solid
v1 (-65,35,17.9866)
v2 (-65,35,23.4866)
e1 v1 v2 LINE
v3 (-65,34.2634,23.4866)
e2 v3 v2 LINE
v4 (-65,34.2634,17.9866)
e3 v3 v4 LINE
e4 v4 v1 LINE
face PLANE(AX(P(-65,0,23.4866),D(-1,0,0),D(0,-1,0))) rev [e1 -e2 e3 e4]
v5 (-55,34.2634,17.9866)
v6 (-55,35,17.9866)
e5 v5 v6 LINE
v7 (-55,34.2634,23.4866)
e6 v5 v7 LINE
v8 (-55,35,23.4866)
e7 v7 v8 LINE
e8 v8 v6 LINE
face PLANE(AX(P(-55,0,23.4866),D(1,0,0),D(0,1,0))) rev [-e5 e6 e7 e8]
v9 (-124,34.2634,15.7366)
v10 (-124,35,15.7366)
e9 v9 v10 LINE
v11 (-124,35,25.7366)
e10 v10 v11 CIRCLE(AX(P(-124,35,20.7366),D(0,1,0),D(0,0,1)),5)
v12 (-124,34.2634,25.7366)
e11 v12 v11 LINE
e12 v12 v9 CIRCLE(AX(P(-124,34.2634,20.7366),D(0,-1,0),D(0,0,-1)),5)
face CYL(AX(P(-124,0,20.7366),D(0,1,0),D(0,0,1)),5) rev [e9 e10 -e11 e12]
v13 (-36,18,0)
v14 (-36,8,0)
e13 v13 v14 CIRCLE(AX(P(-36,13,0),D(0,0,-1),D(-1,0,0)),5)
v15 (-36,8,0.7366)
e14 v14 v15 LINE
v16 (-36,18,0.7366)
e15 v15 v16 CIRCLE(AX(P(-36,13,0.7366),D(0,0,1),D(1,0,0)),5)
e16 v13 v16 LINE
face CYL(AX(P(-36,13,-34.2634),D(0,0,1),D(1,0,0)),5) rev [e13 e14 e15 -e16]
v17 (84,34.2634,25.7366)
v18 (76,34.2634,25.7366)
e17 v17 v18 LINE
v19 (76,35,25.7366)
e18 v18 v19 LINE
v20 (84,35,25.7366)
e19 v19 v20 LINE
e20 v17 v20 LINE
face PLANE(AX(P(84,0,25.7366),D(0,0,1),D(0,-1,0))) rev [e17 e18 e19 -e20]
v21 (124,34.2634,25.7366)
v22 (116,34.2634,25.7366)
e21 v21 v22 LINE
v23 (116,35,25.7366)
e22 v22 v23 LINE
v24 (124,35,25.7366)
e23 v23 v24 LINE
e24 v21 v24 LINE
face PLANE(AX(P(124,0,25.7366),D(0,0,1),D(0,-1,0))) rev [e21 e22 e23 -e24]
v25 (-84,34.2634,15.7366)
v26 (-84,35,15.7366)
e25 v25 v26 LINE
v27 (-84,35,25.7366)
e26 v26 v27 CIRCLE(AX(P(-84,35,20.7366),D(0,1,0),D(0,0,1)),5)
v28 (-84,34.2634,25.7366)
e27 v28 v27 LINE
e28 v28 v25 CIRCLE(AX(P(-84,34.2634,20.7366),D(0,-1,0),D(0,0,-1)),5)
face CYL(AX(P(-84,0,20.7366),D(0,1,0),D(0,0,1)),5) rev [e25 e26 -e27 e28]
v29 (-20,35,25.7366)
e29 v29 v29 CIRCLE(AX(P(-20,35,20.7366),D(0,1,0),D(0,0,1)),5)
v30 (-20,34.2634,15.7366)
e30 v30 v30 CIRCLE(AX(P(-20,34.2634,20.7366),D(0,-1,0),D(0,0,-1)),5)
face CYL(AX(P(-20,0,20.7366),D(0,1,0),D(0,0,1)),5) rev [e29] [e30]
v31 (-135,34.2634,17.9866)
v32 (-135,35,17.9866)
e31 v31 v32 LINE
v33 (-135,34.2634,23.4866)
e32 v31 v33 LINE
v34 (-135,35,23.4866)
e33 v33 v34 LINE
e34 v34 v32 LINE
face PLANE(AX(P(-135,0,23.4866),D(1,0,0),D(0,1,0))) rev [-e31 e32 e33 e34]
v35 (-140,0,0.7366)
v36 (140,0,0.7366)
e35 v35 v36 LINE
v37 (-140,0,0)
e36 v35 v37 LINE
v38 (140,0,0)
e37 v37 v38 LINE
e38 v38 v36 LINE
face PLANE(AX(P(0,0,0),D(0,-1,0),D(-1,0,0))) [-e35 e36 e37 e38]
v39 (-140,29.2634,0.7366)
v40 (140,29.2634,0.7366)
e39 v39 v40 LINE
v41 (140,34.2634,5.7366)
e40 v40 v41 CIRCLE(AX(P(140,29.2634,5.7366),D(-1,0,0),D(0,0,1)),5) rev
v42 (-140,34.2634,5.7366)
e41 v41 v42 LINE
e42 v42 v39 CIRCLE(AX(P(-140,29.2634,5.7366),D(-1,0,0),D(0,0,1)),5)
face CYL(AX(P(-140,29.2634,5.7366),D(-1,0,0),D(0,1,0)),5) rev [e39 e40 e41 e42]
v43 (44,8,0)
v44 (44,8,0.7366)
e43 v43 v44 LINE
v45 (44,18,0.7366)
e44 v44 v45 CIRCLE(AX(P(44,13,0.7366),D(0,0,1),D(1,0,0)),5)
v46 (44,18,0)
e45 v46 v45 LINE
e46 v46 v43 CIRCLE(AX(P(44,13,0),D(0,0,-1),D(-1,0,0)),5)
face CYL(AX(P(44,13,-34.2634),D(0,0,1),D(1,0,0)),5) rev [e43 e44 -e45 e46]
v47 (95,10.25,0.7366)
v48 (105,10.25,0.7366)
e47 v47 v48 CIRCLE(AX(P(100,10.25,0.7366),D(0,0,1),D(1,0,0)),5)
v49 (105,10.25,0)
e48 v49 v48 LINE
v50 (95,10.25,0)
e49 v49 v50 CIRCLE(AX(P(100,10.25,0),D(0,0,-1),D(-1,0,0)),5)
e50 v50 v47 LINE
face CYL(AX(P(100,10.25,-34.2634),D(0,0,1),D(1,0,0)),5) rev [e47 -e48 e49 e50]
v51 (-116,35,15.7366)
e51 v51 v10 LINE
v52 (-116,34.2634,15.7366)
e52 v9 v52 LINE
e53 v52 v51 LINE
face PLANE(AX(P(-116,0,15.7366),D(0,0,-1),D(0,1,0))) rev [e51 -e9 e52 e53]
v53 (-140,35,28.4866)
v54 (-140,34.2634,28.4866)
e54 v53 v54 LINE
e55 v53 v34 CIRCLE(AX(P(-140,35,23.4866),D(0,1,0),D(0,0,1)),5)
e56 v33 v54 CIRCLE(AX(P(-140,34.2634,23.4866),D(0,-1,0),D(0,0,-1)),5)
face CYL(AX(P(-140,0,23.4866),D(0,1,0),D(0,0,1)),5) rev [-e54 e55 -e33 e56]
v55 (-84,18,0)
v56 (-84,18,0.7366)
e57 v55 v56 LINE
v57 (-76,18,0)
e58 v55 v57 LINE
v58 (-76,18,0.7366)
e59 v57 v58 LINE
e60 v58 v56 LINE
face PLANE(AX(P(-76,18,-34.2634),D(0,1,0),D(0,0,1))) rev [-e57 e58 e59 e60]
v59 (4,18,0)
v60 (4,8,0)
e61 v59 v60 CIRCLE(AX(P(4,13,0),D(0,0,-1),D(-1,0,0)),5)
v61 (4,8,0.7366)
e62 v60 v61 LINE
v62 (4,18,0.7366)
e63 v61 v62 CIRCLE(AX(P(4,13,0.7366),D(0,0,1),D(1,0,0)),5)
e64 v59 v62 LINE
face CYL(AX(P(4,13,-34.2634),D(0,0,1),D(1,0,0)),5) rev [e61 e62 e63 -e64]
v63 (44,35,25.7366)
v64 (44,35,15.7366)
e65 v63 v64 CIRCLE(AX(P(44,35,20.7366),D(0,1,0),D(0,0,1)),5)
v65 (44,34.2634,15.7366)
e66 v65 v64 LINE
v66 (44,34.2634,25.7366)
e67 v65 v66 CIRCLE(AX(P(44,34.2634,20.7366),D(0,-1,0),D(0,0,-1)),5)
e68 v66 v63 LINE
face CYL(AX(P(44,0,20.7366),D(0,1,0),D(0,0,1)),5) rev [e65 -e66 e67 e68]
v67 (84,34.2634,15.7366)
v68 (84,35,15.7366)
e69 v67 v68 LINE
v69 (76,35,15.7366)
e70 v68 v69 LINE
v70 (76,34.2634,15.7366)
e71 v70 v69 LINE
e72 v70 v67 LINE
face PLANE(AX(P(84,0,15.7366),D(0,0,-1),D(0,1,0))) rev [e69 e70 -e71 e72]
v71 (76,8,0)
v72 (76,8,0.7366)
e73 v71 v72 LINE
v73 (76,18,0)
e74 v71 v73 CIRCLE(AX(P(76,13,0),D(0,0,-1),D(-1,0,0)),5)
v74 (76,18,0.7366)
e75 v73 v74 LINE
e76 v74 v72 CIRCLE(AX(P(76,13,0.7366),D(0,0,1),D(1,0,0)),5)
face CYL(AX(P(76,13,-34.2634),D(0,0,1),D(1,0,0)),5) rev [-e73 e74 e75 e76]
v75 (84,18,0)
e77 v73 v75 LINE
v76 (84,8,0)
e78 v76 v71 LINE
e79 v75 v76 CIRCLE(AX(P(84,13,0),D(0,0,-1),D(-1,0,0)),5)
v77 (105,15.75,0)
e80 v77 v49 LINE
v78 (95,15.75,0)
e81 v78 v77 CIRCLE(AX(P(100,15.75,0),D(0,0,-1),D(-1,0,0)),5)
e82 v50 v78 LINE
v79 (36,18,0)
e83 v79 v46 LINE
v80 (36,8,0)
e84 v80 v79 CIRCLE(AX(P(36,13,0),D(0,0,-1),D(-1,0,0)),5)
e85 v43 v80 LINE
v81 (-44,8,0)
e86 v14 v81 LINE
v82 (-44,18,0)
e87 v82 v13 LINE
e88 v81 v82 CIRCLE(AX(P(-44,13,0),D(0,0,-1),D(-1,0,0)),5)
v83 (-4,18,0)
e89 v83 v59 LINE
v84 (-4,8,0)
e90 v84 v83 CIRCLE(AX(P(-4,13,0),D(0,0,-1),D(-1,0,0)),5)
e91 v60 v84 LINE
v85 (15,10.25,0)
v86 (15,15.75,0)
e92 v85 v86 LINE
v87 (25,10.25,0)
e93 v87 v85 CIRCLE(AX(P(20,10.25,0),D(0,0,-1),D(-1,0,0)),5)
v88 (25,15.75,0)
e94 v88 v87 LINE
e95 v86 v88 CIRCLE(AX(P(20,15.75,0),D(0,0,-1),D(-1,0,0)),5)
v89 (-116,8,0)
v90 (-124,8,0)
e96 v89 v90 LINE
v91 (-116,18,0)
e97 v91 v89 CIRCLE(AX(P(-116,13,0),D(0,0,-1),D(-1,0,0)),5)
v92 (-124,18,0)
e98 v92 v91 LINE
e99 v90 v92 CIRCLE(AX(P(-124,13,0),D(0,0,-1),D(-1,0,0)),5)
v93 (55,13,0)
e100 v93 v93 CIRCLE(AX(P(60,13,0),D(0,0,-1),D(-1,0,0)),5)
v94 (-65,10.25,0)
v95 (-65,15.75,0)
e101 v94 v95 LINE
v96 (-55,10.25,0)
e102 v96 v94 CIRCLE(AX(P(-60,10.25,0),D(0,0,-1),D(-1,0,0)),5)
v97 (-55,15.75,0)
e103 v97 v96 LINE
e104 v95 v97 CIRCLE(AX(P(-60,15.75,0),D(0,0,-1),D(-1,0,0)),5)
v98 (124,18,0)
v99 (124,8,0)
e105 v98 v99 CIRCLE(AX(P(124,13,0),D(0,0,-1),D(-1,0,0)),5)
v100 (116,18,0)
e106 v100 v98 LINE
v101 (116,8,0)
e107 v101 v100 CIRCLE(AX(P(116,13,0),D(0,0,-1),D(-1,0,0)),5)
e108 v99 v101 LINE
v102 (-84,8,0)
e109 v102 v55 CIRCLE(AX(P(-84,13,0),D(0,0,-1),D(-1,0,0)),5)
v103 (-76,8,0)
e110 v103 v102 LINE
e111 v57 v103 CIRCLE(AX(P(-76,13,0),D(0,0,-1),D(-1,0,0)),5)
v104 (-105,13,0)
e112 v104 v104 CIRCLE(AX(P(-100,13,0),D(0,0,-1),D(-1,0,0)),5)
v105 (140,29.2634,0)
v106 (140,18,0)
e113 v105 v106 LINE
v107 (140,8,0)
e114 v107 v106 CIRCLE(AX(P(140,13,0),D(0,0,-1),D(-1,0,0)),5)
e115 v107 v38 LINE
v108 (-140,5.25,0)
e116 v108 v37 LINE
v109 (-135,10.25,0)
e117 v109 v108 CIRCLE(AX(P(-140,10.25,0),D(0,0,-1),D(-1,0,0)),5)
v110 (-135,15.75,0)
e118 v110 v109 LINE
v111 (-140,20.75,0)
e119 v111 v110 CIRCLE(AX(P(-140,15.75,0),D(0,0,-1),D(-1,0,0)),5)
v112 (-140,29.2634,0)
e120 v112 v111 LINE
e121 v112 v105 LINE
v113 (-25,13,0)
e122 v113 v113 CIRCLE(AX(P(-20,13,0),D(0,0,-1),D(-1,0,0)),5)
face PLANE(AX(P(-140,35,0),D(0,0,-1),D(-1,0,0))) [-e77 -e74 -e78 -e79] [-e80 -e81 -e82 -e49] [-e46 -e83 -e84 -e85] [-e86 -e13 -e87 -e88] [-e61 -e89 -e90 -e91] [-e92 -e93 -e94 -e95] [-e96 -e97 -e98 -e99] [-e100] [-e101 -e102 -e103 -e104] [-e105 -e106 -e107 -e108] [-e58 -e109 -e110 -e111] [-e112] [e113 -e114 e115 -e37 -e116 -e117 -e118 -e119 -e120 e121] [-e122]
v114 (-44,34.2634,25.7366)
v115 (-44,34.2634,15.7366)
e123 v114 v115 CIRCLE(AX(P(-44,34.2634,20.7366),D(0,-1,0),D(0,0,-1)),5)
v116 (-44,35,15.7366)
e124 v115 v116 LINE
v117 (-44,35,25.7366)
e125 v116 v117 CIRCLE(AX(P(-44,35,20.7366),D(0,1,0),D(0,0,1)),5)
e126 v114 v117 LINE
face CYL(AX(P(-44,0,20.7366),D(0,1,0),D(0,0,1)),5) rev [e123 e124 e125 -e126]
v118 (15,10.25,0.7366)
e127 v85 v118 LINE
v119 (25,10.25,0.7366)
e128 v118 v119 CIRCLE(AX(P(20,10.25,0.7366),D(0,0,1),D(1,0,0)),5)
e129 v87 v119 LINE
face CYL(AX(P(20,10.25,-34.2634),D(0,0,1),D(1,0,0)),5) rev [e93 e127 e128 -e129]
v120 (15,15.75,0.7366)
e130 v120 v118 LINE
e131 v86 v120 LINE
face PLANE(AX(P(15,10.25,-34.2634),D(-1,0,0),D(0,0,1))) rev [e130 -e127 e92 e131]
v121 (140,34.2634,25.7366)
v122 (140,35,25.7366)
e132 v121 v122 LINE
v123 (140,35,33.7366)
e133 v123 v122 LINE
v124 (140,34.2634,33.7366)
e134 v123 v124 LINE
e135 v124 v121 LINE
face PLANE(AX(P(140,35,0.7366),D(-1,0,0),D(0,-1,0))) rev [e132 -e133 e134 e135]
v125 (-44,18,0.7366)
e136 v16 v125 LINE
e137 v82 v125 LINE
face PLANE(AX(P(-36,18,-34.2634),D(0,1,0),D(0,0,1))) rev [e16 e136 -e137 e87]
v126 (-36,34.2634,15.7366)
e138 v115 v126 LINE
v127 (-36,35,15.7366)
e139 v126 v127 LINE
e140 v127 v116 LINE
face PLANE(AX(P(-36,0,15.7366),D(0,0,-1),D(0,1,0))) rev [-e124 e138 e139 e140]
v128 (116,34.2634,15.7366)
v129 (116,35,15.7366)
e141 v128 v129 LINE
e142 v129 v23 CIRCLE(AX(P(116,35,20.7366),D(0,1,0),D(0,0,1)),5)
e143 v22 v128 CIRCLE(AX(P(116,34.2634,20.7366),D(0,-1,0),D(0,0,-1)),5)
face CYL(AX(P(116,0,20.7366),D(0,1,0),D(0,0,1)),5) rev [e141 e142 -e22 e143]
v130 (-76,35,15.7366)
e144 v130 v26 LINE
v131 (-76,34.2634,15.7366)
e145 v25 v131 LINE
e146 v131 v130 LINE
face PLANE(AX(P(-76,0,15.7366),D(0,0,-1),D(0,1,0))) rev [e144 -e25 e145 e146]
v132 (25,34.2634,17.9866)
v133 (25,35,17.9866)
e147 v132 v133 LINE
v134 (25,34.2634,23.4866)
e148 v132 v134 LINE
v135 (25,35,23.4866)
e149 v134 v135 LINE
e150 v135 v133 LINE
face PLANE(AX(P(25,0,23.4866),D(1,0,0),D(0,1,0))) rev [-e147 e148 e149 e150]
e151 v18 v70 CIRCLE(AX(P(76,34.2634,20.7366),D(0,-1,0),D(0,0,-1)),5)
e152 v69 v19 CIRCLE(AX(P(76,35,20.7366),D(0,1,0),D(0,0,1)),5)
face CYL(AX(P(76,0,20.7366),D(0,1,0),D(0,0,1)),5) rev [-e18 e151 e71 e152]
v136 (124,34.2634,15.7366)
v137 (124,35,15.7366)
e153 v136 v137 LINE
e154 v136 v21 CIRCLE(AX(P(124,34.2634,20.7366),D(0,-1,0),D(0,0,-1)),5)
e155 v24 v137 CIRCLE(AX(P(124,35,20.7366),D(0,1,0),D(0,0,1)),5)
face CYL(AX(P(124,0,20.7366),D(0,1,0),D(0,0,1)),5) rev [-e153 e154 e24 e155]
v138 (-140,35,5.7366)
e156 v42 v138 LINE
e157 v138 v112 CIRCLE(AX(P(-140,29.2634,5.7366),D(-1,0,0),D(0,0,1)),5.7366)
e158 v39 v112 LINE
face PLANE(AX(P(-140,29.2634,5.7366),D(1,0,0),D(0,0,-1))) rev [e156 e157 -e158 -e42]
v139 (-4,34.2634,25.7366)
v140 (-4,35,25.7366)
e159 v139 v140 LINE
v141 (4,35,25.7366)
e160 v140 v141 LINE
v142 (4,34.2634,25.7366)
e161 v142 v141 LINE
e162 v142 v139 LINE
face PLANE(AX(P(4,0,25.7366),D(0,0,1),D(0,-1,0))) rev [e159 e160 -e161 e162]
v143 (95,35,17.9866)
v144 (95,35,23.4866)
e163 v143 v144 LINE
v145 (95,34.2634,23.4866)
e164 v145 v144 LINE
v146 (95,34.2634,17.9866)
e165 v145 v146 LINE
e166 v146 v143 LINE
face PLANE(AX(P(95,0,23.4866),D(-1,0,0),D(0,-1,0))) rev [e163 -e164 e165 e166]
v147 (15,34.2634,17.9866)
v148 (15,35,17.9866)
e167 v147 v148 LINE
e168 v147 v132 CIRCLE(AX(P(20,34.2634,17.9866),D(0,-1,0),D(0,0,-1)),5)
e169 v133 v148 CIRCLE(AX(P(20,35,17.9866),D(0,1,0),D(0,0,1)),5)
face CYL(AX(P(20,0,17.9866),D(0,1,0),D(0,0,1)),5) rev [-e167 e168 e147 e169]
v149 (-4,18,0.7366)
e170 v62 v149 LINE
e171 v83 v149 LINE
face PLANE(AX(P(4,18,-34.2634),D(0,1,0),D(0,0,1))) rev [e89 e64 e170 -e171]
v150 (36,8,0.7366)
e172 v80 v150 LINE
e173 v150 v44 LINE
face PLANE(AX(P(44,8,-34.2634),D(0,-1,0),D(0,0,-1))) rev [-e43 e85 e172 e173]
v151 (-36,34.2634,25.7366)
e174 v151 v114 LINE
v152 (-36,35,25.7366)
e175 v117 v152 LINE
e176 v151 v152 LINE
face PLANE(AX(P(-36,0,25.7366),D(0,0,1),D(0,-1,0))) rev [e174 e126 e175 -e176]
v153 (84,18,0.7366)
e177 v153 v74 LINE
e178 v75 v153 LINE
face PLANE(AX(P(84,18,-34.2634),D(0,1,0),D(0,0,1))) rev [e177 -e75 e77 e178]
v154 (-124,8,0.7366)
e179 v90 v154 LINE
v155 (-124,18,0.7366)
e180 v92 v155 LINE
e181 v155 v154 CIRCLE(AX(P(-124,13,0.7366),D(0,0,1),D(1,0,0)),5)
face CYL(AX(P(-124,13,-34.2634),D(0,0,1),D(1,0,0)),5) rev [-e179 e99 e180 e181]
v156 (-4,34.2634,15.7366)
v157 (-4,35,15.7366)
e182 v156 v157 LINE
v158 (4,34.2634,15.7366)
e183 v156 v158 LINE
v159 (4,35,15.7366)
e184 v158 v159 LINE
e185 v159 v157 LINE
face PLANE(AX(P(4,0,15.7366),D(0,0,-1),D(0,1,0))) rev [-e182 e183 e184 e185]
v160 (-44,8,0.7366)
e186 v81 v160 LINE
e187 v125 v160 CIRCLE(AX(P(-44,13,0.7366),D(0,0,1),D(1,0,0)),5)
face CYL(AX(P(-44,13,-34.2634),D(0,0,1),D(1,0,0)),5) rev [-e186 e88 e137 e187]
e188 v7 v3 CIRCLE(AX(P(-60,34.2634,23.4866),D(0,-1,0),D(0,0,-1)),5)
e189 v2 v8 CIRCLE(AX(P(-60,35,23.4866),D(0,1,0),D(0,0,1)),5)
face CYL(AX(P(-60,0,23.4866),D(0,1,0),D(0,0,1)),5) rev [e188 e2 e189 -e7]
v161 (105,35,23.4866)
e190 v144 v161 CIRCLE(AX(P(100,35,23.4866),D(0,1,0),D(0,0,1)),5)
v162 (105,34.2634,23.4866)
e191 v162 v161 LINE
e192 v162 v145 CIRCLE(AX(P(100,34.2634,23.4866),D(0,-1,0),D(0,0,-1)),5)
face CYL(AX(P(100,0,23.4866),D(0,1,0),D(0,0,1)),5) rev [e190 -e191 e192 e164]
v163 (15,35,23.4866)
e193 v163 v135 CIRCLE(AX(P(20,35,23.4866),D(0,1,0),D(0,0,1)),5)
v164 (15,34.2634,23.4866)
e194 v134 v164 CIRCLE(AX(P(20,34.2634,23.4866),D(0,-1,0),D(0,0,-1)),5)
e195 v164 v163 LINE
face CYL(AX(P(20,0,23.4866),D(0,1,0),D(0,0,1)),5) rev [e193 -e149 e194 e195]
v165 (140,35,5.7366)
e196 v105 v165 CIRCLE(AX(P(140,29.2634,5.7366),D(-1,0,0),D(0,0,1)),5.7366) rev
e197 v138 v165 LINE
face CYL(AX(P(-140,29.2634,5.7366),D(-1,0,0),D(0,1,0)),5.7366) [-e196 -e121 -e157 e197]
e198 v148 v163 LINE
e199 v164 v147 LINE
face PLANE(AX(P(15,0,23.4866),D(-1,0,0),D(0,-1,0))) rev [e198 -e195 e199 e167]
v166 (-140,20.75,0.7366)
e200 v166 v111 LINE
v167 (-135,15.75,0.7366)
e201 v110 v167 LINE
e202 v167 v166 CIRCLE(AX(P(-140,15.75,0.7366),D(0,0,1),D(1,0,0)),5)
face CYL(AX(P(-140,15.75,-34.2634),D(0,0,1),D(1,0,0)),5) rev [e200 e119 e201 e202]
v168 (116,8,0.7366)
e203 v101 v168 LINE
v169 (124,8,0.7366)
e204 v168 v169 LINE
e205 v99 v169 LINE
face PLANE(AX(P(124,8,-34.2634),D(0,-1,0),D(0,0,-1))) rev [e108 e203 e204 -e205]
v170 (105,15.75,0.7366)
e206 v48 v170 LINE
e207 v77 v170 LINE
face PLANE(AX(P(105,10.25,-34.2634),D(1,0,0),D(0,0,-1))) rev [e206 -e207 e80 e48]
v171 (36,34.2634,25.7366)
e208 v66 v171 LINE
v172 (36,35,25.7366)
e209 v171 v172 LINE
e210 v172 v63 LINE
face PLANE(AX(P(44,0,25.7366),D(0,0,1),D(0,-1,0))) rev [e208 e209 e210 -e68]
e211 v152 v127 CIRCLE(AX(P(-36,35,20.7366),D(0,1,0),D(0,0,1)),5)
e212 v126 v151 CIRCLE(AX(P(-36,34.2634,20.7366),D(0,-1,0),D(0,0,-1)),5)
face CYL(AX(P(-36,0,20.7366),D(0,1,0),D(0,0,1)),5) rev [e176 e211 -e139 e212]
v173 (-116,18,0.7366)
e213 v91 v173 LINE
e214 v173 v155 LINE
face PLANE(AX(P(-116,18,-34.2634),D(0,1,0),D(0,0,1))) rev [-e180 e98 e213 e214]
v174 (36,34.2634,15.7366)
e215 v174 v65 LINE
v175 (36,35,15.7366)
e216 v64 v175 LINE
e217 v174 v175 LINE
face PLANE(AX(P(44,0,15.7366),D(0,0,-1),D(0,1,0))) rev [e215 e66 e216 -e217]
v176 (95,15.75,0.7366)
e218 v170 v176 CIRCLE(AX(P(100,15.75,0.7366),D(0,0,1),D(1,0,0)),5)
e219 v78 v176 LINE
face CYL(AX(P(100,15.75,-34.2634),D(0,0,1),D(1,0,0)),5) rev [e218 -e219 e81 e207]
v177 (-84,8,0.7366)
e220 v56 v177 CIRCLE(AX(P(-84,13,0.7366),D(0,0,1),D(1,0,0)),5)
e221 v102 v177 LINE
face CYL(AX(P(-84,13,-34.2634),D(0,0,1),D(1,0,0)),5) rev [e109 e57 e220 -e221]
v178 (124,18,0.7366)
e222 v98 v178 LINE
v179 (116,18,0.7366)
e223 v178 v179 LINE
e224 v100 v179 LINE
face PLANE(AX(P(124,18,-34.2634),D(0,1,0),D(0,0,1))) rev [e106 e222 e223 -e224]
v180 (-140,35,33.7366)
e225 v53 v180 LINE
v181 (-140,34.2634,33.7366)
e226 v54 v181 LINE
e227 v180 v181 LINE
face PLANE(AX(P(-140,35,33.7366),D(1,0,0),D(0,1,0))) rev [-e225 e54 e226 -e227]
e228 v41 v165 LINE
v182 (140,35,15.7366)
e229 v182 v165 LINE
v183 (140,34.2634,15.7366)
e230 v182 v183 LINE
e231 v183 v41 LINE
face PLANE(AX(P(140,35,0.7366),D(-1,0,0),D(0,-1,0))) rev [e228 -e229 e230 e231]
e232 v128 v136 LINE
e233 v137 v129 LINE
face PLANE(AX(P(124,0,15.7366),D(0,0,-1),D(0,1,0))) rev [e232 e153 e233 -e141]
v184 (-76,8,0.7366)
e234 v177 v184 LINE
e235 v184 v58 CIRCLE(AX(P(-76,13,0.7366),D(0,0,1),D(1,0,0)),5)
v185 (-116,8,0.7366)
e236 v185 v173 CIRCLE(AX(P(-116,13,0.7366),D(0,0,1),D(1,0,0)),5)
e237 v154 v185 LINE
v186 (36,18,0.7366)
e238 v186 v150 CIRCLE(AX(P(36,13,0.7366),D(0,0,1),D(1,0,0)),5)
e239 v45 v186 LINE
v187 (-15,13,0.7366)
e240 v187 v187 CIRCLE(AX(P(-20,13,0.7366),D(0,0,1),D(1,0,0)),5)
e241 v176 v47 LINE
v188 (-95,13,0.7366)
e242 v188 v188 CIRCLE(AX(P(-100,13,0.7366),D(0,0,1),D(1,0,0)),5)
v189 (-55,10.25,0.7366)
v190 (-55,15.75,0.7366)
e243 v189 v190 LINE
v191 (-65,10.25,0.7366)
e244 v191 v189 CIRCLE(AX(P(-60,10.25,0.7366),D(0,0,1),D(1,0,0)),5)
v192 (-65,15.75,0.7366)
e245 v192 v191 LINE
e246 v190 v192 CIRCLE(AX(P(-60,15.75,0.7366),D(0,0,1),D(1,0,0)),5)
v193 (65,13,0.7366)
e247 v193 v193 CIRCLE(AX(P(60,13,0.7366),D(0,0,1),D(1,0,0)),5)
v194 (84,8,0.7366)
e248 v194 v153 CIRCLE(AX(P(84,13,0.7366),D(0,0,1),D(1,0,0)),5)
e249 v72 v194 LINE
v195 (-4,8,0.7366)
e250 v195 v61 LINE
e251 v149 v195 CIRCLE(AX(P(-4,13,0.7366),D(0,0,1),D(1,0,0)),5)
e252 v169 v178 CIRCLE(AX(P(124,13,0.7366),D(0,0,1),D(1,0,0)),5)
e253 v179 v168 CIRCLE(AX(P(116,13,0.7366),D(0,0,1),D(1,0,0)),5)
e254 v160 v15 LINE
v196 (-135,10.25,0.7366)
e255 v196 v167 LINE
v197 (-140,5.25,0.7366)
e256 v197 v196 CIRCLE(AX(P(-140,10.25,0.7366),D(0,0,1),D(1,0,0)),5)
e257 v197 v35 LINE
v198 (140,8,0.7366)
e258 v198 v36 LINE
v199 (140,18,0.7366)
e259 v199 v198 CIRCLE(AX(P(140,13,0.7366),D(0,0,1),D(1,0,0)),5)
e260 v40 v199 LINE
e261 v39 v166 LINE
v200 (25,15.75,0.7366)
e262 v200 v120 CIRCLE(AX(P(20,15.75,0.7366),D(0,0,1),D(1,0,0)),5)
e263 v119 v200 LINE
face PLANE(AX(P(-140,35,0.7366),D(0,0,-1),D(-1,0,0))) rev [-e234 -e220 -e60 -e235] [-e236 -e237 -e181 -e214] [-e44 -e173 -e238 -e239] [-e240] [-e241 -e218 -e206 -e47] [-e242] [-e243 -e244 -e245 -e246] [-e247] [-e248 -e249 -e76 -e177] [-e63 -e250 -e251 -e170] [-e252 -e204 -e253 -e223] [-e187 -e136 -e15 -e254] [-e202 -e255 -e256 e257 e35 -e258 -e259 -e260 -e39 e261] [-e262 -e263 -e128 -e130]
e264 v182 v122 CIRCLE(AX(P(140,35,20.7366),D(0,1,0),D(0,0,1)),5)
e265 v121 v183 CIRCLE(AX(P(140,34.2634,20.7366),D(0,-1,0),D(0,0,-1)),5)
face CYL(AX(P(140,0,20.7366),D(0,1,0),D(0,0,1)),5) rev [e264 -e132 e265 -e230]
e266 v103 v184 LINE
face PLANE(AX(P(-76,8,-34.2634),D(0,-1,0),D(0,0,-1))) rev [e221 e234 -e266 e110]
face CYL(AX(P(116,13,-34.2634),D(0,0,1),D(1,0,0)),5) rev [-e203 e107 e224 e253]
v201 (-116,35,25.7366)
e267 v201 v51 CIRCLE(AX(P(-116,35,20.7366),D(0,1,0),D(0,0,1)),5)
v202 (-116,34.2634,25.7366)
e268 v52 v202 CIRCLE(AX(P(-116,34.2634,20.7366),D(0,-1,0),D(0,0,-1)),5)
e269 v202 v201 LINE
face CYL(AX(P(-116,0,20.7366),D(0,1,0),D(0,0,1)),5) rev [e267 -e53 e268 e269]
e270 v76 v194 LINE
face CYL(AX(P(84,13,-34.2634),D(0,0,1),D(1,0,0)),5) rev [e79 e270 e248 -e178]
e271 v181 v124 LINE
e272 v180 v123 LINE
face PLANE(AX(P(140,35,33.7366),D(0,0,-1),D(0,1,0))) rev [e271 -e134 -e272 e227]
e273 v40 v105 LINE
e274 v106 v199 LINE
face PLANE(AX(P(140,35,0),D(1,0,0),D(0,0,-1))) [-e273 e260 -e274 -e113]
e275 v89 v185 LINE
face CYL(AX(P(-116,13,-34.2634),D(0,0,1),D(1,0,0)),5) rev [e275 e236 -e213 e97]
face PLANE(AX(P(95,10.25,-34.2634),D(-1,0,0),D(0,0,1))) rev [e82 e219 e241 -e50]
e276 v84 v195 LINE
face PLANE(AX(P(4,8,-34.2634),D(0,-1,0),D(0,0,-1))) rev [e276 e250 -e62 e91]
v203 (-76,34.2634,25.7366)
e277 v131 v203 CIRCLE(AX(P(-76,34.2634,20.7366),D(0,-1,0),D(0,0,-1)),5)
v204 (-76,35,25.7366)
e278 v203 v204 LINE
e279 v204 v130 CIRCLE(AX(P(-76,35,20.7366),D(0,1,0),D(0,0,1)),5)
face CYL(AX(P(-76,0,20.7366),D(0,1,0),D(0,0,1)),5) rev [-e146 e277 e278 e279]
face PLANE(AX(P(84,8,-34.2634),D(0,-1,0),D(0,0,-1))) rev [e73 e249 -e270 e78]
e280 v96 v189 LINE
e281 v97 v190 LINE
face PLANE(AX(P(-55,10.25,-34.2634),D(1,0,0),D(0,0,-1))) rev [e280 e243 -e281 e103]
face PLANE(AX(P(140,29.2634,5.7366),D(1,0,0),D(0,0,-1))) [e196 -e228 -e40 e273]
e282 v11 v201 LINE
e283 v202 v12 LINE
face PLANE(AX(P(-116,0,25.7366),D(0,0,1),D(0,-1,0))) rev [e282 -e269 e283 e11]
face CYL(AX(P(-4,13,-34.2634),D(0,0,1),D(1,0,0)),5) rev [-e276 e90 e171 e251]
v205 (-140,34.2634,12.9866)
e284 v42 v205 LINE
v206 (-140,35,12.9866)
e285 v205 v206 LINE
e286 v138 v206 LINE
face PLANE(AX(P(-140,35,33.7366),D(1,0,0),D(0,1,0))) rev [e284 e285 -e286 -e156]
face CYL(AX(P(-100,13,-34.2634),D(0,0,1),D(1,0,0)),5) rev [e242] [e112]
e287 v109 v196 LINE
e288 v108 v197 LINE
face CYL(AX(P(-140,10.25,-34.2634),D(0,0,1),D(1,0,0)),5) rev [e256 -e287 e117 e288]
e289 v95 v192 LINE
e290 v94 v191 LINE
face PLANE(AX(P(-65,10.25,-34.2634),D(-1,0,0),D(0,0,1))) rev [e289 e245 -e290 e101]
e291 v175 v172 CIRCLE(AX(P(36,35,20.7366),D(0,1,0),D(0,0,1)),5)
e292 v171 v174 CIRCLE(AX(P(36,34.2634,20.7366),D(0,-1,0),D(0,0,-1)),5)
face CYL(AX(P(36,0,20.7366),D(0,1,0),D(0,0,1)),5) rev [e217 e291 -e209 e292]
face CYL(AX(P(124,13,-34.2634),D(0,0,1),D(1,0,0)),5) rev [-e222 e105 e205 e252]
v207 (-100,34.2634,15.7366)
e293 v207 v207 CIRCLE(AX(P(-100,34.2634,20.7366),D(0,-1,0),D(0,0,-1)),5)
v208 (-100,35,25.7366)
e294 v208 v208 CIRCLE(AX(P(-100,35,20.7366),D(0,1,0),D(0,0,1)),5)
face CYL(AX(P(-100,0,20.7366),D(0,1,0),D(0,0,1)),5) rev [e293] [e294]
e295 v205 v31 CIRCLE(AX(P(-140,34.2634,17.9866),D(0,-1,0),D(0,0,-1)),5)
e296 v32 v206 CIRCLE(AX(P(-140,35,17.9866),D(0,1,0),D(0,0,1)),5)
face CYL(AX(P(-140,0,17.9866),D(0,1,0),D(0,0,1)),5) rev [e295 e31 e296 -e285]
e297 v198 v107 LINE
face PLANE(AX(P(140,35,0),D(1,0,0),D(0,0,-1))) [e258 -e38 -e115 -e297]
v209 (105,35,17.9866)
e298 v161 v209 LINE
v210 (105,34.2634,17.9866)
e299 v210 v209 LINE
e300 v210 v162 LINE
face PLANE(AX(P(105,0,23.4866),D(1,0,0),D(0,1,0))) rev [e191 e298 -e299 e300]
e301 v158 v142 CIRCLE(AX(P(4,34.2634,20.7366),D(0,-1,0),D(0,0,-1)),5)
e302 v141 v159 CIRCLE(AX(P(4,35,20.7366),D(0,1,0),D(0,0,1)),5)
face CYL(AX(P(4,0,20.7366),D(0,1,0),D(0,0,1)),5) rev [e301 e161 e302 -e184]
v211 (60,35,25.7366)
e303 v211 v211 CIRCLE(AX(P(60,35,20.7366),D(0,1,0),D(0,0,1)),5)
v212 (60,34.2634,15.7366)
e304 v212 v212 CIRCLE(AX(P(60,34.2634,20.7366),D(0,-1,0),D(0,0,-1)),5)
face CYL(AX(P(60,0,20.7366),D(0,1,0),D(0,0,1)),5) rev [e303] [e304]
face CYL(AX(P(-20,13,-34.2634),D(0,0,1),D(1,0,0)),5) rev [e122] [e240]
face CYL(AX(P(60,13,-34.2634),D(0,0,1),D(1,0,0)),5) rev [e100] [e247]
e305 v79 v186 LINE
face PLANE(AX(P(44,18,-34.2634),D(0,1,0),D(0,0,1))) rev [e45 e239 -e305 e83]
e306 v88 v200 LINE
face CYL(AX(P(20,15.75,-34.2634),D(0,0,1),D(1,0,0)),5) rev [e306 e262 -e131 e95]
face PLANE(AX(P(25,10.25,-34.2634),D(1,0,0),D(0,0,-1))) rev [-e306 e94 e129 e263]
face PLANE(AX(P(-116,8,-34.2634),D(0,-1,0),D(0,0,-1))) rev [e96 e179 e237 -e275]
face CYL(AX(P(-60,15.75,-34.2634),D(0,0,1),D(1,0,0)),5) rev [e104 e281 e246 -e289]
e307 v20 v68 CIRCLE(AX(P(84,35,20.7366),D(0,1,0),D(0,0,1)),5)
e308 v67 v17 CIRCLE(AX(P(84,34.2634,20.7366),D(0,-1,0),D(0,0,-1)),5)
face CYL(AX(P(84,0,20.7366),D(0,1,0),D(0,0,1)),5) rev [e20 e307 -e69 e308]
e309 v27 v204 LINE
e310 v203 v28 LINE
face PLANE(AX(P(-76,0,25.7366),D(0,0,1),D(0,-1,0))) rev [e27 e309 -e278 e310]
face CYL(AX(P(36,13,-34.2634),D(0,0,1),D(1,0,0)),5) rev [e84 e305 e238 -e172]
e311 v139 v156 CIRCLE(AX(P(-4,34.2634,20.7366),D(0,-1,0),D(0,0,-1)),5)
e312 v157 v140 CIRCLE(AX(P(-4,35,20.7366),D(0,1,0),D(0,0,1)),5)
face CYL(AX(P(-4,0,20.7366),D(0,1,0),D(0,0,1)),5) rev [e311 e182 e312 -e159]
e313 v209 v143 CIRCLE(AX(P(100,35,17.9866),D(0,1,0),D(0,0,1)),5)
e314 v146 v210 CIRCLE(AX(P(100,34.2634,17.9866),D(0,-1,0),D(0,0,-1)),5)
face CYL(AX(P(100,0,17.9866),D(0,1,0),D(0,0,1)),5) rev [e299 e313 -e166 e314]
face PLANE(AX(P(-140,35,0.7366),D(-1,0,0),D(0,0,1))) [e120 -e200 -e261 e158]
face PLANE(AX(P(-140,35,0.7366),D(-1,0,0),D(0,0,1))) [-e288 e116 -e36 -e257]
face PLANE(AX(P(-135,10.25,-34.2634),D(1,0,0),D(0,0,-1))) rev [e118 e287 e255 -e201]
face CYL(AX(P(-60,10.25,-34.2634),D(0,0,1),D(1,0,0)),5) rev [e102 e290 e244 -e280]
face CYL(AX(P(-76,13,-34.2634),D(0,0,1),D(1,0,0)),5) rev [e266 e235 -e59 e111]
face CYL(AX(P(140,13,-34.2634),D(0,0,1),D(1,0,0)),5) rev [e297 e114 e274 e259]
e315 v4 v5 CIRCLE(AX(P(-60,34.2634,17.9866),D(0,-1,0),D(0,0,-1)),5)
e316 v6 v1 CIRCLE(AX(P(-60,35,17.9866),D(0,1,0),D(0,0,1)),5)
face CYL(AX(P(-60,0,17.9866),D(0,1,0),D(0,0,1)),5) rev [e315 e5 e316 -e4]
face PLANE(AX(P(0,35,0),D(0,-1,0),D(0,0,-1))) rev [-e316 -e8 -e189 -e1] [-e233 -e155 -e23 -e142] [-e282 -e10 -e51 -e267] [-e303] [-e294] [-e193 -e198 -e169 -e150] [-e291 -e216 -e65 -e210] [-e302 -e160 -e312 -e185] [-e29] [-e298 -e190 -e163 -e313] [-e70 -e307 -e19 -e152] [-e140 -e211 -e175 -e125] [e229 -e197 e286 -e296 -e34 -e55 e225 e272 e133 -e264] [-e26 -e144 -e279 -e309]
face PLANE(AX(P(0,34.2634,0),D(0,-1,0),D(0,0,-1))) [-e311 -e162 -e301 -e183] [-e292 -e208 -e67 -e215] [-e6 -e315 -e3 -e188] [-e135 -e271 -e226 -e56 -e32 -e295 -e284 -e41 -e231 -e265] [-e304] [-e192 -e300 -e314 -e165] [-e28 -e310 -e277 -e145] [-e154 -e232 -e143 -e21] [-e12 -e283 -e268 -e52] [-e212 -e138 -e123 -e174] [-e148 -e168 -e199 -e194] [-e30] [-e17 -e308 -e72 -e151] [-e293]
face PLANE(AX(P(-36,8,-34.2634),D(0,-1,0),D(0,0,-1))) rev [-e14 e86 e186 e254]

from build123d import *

# Parameters (mm, degrees)
SKETCH1_W                    = 280
SKETCH1_H                    = 0.7366
BASE_FLANGE1_DEPTH           = 35
EDGE_FLANGE1_STRIP_W         = 12.9464
EDGE_FLANGE1_STRIP_H         = 0.7366
EDGE_FLANGE1_STRIP_CUT_DEPTH = 280
EDGE_FLANGE1_DEPTH           = 280
SKETCH11_R                   = 5
CUT_EXTRUDE1_DEPTH           = 149.199723952
LPATTERN1_COUNT              = 14
LPATTERN1_PITCH              = 80
SKETCH12_R                   = 5
CUT_EXTRUDE2_DEPTH           = 35
LPATTERN2_COUNT              = 15
LPATTERN2_PITCH              = 80


# Sheet-metal steps are written as plain solids
with BuildPart() as part:
    # Sketch1 → Base-Flange1 (new body)
    with BuildSketch(Plane(origin=(0, 0, 0), x_dir=(1, 0, 0), z_dir=(0, 1, 0))):
        with Locations((0, -0.3683)):
            Rectangle(SKETCH1_W, SKETCH1_H)
    extrude(amount=BASE_FLANGE1_DEPTH)

    # Edge-Flange1 strip (across the edge) → Edge-Flange1 strip cut (cut)
    with BuildSketch(Plane(origin=(140, 35, 0.7366), x_dir=(0, -1, 0), z_dir=(-1, 0, 0))):
        with Locations((-0.7366, -0.3683)):
            Rectangle(EDGE_FLANGE1_STRIP_W, EDGE_FLANGE1_STRIP_H)
    extrude(amount=EDGE_FLANGE1_STRIP_CUT_DEPTH, mode=Mode.SUBTRACT)

    # Edge-Flange1 section (across the edge) → Edge-Flange1 (add)
    with BuildSketch(Plane(origin=(140, 35, 0.7366), x_dir=(0, -1, 0), z_dir=(-1, 0, 0))):
        with BuildLine():
            Line((0, 5), (0, 33))
            Line((0, 33), (0.7366, 33))
            Line((0.7366, 33), (0.7366, 5))
            ThreePointArc((0.7366, 5), (2.201066094, 1.464466094), (5.7366, 0))
            Line((5.7366, 0), (5.7366, -0.7366))
            ThreePointArc((5.7366, -0.7366), (1.680211239, 0.943611239), (0, 5))
        make_face()
    extrude(amount=EDGE_FLANGE1_DEPTH)

    # Sketch11 → Cut-Extrude1 (cut, through all)
    with BuildSketch(Plane(origin=(0, 35, 0), x_dir=(1, 0, 0), z_dir=(0, 1, 0))):
        with Locations((140, -20.7366)):
            Circle(SKETCH11_R)
        with BuildLine():
            Line((124, -25.7366), (116, -25.7366))
            ThreePointArc((116, -25.7366), (111, -20.7366), (116, -15.7366))
            Line((116, -15.7366), (124, -15.7366))
            ThreePointArc((124, -15.7366), (129, -20.7366), (124, -25.7366))
        make_face()
        with BuildLine():
            Line((84, -25.7366), (76, -25.7366))
            ThreePointArc((76, -25.7366), (71, -20.7366), (76, -15.7366))
            Line((76, -15.7366), (84, -15.7366))
            ThreePointArc((84, -15.7366), (89, -20.7366), (84, -25.7366))
        make_face()
        with BuildLine():
            Line((95, -23.4866), (95, -17.9866))
            ThreePointArc((95, -17.9866), (100, -12.9866), (105, -17.9866))
            Line((105, -17.9866), (105, -23.4866))
            ThreePointArc((105, -23.4866), (100, -28.4866), (95, -23.4866))
        make_face()
    cut_extrude1 = extrude(amount=-CUT_EXTRUDE1_DEPTH, mode=Mode.SUBTRACT)

    # LPattern1: Cut-Extrude1 ×14
    with Locations(*[(-i * LPATTERN1_PITCH, 0, 0) for i in range(1, LPATTERN1_COUNT)]):
        add(cut_extrude1, mode=Mode.SUBTRACT)

    # Sketch12 → Cut-Extrude2 (cut)
    with BuildSketch(Plane.XY.offset(0.7366)):
        with Locations((140, 13)):
            Circle(SKETCH12_R)
        with BuildLine():
            Line((124, 8), (116, 8))
            ThreePointArc((116, 8), (111, 13), (116, 18))
            Line((116, 18), (124, 18))
            ThreePointArc((124, 18), (129, 13), (124, 8))
        make_face()
        with BuildLine():
            Line((95, 10.25), (95, 15.75))
            ThreePointArc((95, 15.75), (100, 20.75), (105, 15.75))
            Line((105, 15.75), (105, 10.25))
            ThreePointArc((105, 10.25), (100, 5.25), (95, 10.25))
        make_face()
        with BuildLine():
            Line((84, 8), (76, 8))
            ThreePointArc((76, 8), (71, 13), (76, 18))
            Line((76, 18), (84, 18))
            ThreePointArc((84, 18), (89, 13), (84, 8))
        make_face()
    cut_extrude2 = extrude(amount=-CUT_EXTRUDE2_DEPTH, mode=Mode.SUBTRACT)

    # LPattern2: Cut-Extrude2 ×15
    with Locations(*[(-i * LPATTERN2_PITCH, 0, 0) for i in range(1, LPATTERN2_COUNT)]):
        add(cut_extrude2, mode=Mode.SUBTRACT)


solid = part.part
